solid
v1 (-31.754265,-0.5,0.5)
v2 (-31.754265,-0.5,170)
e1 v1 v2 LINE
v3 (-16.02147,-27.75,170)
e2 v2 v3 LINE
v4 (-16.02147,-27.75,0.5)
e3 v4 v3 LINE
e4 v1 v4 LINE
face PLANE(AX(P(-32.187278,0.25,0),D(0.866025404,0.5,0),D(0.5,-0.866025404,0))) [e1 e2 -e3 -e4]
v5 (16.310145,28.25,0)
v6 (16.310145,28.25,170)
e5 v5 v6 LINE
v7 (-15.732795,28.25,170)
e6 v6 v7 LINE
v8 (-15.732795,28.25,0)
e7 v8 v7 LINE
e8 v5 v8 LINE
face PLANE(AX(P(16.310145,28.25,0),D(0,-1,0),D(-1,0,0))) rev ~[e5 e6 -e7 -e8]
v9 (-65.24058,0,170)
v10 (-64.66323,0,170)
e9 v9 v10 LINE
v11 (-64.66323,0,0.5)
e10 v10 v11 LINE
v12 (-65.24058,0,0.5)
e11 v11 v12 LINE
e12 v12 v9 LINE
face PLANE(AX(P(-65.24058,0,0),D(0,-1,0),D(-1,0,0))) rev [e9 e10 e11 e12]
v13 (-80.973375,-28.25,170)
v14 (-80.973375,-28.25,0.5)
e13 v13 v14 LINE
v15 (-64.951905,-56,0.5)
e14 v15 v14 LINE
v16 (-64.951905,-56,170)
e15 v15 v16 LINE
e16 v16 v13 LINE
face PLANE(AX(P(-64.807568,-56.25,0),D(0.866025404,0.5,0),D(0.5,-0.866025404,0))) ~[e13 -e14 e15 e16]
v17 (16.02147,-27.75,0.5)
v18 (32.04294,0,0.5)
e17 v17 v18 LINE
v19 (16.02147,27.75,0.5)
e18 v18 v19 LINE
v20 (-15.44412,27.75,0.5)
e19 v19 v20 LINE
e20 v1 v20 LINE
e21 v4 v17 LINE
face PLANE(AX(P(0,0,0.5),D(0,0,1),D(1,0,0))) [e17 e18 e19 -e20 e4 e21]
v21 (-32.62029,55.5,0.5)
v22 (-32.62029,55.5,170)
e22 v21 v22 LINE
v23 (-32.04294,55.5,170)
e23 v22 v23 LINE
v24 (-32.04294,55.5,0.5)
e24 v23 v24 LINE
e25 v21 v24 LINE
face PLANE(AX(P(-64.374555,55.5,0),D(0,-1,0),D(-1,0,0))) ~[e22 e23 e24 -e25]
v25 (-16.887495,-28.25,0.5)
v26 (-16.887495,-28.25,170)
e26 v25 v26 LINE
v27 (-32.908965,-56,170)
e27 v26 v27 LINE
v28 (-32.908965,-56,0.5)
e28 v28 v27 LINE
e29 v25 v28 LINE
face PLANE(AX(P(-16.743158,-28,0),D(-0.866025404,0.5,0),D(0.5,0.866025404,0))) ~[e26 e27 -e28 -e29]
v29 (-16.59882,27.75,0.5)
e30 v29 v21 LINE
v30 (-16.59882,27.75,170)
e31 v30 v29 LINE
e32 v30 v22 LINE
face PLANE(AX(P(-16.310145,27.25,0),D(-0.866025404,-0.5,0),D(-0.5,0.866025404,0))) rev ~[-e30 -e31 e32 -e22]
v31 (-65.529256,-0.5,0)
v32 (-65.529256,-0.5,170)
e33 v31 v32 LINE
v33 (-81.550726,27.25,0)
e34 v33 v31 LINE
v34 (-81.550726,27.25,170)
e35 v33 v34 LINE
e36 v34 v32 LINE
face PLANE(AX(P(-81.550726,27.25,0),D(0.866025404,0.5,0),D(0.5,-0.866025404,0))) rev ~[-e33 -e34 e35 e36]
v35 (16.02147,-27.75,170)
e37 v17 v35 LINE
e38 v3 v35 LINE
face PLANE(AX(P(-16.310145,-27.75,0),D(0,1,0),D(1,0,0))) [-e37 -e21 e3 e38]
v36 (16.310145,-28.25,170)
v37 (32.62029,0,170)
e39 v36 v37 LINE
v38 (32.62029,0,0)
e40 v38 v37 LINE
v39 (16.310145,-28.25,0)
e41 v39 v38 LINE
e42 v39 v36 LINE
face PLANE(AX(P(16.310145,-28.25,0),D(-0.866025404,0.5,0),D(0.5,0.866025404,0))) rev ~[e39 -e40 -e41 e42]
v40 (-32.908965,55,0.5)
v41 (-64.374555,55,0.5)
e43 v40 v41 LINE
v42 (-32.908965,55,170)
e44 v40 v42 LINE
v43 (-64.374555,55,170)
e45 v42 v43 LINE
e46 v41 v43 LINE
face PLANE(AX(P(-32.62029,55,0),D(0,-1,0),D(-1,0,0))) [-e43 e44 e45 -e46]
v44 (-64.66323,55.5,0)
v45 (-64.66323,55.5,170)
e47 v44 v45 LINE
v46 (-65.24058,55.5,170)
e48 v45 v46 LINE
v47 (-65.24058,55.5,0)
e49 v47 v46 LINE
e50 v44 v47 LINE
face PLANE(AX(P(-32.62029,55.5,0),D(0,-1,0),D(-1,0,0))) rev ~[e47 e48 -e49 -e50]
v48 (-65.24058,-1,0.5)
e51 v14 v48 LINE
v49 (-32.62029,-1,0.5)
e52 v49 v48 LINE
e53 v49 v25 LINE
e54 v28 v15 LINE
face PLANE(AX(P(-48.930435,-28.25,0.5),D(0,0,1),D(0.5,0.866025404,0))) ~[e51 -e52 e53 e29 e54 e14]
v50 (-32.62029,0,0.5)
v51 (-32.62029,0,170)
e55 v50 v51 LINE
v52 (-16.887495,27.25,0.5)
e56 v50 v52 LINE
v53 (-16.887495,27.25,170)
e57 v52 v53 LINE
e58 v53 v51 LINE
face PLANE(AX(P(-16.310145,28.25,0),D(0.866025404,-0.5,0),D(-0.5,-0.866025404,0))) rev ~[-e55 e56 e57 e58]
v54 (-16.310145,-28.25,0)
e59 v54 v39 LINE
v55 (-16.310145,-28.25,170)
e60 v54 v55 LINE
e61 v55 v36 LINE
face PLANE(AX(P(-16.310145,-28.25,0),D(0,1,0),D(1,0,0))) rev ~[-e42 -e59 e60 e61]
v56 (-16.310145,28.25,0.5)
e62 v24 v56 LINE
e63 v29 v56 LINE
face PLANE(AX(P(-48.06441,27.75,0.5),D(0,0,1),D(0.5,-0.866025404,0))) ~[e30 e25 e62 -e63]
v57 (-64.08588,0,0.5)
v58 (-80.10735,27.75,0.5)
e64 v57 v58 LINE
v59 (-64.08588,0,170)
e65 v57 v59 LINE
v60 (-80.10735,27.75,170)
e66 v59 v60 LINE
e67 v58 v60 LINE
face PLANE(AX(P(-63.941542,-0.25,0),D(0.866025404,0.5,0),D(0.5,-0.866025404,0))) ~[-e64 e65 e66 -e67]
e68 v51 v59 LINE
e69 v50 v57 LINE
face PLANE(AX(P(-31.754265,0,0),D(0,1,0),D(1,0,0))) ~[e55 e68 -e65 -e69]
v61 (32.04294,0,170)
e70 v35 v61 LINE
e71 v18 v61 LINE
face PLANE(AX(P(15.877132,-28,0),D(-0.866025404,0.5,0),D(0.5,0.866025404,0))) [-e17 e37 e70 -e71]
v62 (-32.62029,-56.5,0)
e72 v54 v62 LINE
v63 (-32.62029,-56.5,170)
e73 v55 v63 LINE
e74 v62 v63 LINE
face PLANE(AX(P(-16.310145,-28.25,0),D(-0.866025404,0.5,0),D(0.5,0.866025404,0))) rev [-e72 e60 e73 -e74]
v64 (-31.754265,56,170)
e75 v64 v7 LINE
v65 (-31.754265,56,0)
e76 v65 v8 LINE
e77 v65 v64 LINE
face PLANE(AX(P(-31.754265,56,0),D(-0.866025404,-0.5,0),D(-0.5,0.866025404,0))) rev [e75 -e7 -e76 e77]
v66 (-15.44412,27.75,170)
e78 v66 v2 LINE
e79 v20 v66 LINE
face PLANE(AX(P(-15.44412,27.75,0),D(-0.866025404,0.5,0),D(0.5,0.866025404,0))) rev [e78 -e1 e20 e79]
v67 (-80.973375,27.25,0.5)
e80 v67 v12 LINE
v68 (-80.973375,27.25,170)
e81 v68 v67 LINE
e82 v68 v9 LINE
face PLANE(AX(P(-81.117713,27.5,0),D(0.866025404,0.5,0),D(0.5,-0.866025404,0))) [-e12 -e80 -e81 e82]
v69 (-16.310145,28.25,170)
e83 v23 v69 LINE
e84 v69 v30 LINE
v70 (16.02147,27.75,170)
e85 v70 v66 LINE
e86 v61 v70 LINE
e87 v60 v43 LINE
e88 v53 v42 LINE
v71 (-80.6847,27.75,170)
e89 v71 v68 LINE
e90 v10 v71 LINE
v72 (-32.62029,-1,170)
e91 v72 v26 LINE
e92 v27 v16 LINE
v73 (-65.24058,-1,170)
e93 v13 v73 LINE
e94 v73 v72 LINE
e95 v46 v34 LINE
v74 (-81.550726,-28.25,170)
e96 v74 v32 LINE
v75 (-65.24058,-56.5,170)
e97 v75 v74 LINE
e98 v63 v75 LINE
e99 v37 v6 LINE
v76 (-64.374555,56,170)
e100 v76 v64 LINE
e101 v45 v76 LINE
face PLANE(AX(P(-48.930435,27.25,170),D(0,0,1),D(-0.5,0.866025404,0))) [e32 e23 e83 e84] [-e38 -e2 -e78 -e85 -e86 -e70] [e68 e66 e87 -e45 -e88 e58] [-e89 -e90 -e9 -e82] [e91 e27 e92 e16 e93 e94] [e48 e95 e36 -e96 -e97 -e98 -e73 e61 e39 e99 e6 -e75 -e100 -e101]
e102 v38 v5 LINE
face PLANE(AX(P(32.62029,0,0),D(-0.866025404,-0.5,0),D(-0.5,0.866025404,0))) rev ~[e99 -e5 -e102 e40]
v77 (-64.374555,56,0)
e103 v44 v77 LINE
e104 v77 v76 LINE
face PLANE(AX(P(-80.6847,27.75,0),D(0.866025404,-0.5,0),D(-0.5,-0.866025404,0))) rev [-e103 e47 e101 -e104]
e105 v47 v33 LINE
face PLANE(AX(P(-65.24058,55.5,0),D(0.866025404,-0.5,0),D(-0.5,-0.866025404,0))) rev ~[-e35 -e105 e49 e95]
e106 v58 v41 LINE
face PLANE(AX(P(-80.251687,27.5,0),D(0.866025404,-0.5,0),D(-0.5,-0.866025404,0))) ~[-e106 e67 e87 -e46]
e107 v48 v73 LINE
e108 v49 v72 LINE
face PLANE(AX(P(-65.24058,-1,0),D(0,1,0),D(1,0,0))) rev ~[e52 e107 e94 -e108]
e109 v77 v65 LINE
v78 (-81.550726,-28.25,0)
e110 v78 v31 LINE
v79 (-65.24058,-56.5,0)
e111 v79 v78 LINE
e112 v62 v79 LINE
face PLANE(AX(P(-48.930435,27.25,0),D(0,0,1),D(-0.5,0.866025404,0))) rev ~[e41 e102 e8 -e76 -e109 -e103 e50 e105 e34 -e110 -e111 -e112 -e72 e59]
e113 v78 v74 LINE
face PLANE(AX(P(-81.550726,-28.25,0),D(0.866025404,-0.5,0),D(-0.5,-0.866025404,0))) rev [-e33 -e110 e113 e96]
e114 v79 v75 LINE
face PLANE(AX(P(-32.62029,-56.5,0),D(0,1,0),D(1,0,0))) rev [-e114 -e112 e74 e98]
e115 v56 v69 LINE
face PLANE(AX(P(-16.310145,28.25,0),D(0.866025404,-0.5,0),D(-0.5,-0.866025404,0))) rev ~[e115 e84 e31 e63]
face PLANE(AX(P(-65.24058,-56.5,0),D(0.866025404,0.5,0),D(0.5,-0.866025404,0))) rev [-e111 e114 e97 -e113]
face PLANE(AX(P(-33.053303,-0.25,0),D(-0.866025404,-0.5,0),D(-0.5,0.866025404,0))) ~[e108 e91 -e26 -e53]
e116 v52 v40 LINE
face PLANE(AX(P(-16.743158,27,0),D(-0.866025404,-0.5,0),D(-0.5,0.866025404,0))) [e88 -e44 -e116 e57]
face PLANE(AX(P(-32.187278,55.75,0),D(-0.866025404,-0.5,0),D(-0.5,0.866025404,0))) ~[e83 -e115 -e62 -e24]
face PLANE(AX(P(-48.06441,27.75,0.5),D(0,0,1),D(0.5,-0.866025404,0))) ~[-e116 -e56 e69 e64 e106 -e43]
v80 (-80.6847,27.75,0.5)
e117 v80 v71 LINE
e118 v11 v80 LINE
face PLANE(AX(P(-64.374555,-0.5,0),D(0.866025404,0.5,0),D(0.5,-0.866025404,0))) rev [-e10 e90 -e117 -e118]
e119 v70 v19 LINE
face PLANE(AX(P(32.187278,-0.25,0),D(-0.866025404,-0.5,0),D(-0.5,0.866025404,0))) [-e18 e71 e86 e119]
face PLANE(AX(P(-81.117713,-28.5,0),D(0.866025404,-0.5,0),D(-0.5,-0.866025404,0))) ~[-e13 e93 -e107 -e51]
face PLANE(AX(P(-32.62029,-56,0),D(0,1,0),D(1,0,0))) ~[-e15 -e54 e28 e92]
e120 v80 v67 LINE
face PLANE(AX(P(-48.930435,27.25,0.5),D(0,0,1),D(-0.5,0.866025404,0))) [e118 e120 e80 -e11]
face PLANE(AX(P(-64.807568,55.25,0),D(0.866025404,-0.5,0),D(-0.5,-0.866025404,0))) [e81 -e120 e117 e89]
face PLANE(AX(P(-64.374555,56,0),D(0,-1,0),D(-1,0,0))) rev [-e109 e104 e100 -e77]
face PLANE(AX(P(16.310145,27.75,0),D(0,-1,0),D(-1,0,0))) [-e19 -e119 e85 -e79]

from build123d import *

# Parameters (mm, degrees)
F1_DEPTH = 170
F2_T     = -0.5


# Not quite as in the source:
# - a feature names something its author has since deleted; it is built from what else it names


with BuildPart() as f1:
    # F0 (on Top) → F1 (new body)
    with BuildSketch(Plane.XY):
        Polygon((16.3101451046, 28.25), (-16.3101451046, 28.25), (-32.6202902092, 0), (-16.3101451046, -28.25), (16.3101451046, -28.25), (32.6202902092, 0), align=None)
    extrude(amount=F1_DEPTH)

    # F2
    f2_openings = [f1.faces().sort_by_distance(p)[0] for p in [
        (0, 0, 170),
    ]]
    offset(amount=F2_T, openings=f2_openings)

    # F3: F1 across face


with BuildPart() as f1_1:
    add(f1.part)
    add(f1.part.mirror(Plane(origin=(-24.032204955, 13.875, 85.25), x_dir=(0.5, 0.8660254038, 0), z_dir=(0.8660254038, -0.5, 0))))

    # F4: F1 across face


with BuildPart() as f1_2:
    add(f1_1.part)
    add(f1_1.part.mirror(Plane(origin=(-24.3208800896, -14.375, 85), x_dir=(0.5, -0.8660254038, 0), z_dir=(-0.8660254038, -0.5, 0))))


solid = f1_2.part
